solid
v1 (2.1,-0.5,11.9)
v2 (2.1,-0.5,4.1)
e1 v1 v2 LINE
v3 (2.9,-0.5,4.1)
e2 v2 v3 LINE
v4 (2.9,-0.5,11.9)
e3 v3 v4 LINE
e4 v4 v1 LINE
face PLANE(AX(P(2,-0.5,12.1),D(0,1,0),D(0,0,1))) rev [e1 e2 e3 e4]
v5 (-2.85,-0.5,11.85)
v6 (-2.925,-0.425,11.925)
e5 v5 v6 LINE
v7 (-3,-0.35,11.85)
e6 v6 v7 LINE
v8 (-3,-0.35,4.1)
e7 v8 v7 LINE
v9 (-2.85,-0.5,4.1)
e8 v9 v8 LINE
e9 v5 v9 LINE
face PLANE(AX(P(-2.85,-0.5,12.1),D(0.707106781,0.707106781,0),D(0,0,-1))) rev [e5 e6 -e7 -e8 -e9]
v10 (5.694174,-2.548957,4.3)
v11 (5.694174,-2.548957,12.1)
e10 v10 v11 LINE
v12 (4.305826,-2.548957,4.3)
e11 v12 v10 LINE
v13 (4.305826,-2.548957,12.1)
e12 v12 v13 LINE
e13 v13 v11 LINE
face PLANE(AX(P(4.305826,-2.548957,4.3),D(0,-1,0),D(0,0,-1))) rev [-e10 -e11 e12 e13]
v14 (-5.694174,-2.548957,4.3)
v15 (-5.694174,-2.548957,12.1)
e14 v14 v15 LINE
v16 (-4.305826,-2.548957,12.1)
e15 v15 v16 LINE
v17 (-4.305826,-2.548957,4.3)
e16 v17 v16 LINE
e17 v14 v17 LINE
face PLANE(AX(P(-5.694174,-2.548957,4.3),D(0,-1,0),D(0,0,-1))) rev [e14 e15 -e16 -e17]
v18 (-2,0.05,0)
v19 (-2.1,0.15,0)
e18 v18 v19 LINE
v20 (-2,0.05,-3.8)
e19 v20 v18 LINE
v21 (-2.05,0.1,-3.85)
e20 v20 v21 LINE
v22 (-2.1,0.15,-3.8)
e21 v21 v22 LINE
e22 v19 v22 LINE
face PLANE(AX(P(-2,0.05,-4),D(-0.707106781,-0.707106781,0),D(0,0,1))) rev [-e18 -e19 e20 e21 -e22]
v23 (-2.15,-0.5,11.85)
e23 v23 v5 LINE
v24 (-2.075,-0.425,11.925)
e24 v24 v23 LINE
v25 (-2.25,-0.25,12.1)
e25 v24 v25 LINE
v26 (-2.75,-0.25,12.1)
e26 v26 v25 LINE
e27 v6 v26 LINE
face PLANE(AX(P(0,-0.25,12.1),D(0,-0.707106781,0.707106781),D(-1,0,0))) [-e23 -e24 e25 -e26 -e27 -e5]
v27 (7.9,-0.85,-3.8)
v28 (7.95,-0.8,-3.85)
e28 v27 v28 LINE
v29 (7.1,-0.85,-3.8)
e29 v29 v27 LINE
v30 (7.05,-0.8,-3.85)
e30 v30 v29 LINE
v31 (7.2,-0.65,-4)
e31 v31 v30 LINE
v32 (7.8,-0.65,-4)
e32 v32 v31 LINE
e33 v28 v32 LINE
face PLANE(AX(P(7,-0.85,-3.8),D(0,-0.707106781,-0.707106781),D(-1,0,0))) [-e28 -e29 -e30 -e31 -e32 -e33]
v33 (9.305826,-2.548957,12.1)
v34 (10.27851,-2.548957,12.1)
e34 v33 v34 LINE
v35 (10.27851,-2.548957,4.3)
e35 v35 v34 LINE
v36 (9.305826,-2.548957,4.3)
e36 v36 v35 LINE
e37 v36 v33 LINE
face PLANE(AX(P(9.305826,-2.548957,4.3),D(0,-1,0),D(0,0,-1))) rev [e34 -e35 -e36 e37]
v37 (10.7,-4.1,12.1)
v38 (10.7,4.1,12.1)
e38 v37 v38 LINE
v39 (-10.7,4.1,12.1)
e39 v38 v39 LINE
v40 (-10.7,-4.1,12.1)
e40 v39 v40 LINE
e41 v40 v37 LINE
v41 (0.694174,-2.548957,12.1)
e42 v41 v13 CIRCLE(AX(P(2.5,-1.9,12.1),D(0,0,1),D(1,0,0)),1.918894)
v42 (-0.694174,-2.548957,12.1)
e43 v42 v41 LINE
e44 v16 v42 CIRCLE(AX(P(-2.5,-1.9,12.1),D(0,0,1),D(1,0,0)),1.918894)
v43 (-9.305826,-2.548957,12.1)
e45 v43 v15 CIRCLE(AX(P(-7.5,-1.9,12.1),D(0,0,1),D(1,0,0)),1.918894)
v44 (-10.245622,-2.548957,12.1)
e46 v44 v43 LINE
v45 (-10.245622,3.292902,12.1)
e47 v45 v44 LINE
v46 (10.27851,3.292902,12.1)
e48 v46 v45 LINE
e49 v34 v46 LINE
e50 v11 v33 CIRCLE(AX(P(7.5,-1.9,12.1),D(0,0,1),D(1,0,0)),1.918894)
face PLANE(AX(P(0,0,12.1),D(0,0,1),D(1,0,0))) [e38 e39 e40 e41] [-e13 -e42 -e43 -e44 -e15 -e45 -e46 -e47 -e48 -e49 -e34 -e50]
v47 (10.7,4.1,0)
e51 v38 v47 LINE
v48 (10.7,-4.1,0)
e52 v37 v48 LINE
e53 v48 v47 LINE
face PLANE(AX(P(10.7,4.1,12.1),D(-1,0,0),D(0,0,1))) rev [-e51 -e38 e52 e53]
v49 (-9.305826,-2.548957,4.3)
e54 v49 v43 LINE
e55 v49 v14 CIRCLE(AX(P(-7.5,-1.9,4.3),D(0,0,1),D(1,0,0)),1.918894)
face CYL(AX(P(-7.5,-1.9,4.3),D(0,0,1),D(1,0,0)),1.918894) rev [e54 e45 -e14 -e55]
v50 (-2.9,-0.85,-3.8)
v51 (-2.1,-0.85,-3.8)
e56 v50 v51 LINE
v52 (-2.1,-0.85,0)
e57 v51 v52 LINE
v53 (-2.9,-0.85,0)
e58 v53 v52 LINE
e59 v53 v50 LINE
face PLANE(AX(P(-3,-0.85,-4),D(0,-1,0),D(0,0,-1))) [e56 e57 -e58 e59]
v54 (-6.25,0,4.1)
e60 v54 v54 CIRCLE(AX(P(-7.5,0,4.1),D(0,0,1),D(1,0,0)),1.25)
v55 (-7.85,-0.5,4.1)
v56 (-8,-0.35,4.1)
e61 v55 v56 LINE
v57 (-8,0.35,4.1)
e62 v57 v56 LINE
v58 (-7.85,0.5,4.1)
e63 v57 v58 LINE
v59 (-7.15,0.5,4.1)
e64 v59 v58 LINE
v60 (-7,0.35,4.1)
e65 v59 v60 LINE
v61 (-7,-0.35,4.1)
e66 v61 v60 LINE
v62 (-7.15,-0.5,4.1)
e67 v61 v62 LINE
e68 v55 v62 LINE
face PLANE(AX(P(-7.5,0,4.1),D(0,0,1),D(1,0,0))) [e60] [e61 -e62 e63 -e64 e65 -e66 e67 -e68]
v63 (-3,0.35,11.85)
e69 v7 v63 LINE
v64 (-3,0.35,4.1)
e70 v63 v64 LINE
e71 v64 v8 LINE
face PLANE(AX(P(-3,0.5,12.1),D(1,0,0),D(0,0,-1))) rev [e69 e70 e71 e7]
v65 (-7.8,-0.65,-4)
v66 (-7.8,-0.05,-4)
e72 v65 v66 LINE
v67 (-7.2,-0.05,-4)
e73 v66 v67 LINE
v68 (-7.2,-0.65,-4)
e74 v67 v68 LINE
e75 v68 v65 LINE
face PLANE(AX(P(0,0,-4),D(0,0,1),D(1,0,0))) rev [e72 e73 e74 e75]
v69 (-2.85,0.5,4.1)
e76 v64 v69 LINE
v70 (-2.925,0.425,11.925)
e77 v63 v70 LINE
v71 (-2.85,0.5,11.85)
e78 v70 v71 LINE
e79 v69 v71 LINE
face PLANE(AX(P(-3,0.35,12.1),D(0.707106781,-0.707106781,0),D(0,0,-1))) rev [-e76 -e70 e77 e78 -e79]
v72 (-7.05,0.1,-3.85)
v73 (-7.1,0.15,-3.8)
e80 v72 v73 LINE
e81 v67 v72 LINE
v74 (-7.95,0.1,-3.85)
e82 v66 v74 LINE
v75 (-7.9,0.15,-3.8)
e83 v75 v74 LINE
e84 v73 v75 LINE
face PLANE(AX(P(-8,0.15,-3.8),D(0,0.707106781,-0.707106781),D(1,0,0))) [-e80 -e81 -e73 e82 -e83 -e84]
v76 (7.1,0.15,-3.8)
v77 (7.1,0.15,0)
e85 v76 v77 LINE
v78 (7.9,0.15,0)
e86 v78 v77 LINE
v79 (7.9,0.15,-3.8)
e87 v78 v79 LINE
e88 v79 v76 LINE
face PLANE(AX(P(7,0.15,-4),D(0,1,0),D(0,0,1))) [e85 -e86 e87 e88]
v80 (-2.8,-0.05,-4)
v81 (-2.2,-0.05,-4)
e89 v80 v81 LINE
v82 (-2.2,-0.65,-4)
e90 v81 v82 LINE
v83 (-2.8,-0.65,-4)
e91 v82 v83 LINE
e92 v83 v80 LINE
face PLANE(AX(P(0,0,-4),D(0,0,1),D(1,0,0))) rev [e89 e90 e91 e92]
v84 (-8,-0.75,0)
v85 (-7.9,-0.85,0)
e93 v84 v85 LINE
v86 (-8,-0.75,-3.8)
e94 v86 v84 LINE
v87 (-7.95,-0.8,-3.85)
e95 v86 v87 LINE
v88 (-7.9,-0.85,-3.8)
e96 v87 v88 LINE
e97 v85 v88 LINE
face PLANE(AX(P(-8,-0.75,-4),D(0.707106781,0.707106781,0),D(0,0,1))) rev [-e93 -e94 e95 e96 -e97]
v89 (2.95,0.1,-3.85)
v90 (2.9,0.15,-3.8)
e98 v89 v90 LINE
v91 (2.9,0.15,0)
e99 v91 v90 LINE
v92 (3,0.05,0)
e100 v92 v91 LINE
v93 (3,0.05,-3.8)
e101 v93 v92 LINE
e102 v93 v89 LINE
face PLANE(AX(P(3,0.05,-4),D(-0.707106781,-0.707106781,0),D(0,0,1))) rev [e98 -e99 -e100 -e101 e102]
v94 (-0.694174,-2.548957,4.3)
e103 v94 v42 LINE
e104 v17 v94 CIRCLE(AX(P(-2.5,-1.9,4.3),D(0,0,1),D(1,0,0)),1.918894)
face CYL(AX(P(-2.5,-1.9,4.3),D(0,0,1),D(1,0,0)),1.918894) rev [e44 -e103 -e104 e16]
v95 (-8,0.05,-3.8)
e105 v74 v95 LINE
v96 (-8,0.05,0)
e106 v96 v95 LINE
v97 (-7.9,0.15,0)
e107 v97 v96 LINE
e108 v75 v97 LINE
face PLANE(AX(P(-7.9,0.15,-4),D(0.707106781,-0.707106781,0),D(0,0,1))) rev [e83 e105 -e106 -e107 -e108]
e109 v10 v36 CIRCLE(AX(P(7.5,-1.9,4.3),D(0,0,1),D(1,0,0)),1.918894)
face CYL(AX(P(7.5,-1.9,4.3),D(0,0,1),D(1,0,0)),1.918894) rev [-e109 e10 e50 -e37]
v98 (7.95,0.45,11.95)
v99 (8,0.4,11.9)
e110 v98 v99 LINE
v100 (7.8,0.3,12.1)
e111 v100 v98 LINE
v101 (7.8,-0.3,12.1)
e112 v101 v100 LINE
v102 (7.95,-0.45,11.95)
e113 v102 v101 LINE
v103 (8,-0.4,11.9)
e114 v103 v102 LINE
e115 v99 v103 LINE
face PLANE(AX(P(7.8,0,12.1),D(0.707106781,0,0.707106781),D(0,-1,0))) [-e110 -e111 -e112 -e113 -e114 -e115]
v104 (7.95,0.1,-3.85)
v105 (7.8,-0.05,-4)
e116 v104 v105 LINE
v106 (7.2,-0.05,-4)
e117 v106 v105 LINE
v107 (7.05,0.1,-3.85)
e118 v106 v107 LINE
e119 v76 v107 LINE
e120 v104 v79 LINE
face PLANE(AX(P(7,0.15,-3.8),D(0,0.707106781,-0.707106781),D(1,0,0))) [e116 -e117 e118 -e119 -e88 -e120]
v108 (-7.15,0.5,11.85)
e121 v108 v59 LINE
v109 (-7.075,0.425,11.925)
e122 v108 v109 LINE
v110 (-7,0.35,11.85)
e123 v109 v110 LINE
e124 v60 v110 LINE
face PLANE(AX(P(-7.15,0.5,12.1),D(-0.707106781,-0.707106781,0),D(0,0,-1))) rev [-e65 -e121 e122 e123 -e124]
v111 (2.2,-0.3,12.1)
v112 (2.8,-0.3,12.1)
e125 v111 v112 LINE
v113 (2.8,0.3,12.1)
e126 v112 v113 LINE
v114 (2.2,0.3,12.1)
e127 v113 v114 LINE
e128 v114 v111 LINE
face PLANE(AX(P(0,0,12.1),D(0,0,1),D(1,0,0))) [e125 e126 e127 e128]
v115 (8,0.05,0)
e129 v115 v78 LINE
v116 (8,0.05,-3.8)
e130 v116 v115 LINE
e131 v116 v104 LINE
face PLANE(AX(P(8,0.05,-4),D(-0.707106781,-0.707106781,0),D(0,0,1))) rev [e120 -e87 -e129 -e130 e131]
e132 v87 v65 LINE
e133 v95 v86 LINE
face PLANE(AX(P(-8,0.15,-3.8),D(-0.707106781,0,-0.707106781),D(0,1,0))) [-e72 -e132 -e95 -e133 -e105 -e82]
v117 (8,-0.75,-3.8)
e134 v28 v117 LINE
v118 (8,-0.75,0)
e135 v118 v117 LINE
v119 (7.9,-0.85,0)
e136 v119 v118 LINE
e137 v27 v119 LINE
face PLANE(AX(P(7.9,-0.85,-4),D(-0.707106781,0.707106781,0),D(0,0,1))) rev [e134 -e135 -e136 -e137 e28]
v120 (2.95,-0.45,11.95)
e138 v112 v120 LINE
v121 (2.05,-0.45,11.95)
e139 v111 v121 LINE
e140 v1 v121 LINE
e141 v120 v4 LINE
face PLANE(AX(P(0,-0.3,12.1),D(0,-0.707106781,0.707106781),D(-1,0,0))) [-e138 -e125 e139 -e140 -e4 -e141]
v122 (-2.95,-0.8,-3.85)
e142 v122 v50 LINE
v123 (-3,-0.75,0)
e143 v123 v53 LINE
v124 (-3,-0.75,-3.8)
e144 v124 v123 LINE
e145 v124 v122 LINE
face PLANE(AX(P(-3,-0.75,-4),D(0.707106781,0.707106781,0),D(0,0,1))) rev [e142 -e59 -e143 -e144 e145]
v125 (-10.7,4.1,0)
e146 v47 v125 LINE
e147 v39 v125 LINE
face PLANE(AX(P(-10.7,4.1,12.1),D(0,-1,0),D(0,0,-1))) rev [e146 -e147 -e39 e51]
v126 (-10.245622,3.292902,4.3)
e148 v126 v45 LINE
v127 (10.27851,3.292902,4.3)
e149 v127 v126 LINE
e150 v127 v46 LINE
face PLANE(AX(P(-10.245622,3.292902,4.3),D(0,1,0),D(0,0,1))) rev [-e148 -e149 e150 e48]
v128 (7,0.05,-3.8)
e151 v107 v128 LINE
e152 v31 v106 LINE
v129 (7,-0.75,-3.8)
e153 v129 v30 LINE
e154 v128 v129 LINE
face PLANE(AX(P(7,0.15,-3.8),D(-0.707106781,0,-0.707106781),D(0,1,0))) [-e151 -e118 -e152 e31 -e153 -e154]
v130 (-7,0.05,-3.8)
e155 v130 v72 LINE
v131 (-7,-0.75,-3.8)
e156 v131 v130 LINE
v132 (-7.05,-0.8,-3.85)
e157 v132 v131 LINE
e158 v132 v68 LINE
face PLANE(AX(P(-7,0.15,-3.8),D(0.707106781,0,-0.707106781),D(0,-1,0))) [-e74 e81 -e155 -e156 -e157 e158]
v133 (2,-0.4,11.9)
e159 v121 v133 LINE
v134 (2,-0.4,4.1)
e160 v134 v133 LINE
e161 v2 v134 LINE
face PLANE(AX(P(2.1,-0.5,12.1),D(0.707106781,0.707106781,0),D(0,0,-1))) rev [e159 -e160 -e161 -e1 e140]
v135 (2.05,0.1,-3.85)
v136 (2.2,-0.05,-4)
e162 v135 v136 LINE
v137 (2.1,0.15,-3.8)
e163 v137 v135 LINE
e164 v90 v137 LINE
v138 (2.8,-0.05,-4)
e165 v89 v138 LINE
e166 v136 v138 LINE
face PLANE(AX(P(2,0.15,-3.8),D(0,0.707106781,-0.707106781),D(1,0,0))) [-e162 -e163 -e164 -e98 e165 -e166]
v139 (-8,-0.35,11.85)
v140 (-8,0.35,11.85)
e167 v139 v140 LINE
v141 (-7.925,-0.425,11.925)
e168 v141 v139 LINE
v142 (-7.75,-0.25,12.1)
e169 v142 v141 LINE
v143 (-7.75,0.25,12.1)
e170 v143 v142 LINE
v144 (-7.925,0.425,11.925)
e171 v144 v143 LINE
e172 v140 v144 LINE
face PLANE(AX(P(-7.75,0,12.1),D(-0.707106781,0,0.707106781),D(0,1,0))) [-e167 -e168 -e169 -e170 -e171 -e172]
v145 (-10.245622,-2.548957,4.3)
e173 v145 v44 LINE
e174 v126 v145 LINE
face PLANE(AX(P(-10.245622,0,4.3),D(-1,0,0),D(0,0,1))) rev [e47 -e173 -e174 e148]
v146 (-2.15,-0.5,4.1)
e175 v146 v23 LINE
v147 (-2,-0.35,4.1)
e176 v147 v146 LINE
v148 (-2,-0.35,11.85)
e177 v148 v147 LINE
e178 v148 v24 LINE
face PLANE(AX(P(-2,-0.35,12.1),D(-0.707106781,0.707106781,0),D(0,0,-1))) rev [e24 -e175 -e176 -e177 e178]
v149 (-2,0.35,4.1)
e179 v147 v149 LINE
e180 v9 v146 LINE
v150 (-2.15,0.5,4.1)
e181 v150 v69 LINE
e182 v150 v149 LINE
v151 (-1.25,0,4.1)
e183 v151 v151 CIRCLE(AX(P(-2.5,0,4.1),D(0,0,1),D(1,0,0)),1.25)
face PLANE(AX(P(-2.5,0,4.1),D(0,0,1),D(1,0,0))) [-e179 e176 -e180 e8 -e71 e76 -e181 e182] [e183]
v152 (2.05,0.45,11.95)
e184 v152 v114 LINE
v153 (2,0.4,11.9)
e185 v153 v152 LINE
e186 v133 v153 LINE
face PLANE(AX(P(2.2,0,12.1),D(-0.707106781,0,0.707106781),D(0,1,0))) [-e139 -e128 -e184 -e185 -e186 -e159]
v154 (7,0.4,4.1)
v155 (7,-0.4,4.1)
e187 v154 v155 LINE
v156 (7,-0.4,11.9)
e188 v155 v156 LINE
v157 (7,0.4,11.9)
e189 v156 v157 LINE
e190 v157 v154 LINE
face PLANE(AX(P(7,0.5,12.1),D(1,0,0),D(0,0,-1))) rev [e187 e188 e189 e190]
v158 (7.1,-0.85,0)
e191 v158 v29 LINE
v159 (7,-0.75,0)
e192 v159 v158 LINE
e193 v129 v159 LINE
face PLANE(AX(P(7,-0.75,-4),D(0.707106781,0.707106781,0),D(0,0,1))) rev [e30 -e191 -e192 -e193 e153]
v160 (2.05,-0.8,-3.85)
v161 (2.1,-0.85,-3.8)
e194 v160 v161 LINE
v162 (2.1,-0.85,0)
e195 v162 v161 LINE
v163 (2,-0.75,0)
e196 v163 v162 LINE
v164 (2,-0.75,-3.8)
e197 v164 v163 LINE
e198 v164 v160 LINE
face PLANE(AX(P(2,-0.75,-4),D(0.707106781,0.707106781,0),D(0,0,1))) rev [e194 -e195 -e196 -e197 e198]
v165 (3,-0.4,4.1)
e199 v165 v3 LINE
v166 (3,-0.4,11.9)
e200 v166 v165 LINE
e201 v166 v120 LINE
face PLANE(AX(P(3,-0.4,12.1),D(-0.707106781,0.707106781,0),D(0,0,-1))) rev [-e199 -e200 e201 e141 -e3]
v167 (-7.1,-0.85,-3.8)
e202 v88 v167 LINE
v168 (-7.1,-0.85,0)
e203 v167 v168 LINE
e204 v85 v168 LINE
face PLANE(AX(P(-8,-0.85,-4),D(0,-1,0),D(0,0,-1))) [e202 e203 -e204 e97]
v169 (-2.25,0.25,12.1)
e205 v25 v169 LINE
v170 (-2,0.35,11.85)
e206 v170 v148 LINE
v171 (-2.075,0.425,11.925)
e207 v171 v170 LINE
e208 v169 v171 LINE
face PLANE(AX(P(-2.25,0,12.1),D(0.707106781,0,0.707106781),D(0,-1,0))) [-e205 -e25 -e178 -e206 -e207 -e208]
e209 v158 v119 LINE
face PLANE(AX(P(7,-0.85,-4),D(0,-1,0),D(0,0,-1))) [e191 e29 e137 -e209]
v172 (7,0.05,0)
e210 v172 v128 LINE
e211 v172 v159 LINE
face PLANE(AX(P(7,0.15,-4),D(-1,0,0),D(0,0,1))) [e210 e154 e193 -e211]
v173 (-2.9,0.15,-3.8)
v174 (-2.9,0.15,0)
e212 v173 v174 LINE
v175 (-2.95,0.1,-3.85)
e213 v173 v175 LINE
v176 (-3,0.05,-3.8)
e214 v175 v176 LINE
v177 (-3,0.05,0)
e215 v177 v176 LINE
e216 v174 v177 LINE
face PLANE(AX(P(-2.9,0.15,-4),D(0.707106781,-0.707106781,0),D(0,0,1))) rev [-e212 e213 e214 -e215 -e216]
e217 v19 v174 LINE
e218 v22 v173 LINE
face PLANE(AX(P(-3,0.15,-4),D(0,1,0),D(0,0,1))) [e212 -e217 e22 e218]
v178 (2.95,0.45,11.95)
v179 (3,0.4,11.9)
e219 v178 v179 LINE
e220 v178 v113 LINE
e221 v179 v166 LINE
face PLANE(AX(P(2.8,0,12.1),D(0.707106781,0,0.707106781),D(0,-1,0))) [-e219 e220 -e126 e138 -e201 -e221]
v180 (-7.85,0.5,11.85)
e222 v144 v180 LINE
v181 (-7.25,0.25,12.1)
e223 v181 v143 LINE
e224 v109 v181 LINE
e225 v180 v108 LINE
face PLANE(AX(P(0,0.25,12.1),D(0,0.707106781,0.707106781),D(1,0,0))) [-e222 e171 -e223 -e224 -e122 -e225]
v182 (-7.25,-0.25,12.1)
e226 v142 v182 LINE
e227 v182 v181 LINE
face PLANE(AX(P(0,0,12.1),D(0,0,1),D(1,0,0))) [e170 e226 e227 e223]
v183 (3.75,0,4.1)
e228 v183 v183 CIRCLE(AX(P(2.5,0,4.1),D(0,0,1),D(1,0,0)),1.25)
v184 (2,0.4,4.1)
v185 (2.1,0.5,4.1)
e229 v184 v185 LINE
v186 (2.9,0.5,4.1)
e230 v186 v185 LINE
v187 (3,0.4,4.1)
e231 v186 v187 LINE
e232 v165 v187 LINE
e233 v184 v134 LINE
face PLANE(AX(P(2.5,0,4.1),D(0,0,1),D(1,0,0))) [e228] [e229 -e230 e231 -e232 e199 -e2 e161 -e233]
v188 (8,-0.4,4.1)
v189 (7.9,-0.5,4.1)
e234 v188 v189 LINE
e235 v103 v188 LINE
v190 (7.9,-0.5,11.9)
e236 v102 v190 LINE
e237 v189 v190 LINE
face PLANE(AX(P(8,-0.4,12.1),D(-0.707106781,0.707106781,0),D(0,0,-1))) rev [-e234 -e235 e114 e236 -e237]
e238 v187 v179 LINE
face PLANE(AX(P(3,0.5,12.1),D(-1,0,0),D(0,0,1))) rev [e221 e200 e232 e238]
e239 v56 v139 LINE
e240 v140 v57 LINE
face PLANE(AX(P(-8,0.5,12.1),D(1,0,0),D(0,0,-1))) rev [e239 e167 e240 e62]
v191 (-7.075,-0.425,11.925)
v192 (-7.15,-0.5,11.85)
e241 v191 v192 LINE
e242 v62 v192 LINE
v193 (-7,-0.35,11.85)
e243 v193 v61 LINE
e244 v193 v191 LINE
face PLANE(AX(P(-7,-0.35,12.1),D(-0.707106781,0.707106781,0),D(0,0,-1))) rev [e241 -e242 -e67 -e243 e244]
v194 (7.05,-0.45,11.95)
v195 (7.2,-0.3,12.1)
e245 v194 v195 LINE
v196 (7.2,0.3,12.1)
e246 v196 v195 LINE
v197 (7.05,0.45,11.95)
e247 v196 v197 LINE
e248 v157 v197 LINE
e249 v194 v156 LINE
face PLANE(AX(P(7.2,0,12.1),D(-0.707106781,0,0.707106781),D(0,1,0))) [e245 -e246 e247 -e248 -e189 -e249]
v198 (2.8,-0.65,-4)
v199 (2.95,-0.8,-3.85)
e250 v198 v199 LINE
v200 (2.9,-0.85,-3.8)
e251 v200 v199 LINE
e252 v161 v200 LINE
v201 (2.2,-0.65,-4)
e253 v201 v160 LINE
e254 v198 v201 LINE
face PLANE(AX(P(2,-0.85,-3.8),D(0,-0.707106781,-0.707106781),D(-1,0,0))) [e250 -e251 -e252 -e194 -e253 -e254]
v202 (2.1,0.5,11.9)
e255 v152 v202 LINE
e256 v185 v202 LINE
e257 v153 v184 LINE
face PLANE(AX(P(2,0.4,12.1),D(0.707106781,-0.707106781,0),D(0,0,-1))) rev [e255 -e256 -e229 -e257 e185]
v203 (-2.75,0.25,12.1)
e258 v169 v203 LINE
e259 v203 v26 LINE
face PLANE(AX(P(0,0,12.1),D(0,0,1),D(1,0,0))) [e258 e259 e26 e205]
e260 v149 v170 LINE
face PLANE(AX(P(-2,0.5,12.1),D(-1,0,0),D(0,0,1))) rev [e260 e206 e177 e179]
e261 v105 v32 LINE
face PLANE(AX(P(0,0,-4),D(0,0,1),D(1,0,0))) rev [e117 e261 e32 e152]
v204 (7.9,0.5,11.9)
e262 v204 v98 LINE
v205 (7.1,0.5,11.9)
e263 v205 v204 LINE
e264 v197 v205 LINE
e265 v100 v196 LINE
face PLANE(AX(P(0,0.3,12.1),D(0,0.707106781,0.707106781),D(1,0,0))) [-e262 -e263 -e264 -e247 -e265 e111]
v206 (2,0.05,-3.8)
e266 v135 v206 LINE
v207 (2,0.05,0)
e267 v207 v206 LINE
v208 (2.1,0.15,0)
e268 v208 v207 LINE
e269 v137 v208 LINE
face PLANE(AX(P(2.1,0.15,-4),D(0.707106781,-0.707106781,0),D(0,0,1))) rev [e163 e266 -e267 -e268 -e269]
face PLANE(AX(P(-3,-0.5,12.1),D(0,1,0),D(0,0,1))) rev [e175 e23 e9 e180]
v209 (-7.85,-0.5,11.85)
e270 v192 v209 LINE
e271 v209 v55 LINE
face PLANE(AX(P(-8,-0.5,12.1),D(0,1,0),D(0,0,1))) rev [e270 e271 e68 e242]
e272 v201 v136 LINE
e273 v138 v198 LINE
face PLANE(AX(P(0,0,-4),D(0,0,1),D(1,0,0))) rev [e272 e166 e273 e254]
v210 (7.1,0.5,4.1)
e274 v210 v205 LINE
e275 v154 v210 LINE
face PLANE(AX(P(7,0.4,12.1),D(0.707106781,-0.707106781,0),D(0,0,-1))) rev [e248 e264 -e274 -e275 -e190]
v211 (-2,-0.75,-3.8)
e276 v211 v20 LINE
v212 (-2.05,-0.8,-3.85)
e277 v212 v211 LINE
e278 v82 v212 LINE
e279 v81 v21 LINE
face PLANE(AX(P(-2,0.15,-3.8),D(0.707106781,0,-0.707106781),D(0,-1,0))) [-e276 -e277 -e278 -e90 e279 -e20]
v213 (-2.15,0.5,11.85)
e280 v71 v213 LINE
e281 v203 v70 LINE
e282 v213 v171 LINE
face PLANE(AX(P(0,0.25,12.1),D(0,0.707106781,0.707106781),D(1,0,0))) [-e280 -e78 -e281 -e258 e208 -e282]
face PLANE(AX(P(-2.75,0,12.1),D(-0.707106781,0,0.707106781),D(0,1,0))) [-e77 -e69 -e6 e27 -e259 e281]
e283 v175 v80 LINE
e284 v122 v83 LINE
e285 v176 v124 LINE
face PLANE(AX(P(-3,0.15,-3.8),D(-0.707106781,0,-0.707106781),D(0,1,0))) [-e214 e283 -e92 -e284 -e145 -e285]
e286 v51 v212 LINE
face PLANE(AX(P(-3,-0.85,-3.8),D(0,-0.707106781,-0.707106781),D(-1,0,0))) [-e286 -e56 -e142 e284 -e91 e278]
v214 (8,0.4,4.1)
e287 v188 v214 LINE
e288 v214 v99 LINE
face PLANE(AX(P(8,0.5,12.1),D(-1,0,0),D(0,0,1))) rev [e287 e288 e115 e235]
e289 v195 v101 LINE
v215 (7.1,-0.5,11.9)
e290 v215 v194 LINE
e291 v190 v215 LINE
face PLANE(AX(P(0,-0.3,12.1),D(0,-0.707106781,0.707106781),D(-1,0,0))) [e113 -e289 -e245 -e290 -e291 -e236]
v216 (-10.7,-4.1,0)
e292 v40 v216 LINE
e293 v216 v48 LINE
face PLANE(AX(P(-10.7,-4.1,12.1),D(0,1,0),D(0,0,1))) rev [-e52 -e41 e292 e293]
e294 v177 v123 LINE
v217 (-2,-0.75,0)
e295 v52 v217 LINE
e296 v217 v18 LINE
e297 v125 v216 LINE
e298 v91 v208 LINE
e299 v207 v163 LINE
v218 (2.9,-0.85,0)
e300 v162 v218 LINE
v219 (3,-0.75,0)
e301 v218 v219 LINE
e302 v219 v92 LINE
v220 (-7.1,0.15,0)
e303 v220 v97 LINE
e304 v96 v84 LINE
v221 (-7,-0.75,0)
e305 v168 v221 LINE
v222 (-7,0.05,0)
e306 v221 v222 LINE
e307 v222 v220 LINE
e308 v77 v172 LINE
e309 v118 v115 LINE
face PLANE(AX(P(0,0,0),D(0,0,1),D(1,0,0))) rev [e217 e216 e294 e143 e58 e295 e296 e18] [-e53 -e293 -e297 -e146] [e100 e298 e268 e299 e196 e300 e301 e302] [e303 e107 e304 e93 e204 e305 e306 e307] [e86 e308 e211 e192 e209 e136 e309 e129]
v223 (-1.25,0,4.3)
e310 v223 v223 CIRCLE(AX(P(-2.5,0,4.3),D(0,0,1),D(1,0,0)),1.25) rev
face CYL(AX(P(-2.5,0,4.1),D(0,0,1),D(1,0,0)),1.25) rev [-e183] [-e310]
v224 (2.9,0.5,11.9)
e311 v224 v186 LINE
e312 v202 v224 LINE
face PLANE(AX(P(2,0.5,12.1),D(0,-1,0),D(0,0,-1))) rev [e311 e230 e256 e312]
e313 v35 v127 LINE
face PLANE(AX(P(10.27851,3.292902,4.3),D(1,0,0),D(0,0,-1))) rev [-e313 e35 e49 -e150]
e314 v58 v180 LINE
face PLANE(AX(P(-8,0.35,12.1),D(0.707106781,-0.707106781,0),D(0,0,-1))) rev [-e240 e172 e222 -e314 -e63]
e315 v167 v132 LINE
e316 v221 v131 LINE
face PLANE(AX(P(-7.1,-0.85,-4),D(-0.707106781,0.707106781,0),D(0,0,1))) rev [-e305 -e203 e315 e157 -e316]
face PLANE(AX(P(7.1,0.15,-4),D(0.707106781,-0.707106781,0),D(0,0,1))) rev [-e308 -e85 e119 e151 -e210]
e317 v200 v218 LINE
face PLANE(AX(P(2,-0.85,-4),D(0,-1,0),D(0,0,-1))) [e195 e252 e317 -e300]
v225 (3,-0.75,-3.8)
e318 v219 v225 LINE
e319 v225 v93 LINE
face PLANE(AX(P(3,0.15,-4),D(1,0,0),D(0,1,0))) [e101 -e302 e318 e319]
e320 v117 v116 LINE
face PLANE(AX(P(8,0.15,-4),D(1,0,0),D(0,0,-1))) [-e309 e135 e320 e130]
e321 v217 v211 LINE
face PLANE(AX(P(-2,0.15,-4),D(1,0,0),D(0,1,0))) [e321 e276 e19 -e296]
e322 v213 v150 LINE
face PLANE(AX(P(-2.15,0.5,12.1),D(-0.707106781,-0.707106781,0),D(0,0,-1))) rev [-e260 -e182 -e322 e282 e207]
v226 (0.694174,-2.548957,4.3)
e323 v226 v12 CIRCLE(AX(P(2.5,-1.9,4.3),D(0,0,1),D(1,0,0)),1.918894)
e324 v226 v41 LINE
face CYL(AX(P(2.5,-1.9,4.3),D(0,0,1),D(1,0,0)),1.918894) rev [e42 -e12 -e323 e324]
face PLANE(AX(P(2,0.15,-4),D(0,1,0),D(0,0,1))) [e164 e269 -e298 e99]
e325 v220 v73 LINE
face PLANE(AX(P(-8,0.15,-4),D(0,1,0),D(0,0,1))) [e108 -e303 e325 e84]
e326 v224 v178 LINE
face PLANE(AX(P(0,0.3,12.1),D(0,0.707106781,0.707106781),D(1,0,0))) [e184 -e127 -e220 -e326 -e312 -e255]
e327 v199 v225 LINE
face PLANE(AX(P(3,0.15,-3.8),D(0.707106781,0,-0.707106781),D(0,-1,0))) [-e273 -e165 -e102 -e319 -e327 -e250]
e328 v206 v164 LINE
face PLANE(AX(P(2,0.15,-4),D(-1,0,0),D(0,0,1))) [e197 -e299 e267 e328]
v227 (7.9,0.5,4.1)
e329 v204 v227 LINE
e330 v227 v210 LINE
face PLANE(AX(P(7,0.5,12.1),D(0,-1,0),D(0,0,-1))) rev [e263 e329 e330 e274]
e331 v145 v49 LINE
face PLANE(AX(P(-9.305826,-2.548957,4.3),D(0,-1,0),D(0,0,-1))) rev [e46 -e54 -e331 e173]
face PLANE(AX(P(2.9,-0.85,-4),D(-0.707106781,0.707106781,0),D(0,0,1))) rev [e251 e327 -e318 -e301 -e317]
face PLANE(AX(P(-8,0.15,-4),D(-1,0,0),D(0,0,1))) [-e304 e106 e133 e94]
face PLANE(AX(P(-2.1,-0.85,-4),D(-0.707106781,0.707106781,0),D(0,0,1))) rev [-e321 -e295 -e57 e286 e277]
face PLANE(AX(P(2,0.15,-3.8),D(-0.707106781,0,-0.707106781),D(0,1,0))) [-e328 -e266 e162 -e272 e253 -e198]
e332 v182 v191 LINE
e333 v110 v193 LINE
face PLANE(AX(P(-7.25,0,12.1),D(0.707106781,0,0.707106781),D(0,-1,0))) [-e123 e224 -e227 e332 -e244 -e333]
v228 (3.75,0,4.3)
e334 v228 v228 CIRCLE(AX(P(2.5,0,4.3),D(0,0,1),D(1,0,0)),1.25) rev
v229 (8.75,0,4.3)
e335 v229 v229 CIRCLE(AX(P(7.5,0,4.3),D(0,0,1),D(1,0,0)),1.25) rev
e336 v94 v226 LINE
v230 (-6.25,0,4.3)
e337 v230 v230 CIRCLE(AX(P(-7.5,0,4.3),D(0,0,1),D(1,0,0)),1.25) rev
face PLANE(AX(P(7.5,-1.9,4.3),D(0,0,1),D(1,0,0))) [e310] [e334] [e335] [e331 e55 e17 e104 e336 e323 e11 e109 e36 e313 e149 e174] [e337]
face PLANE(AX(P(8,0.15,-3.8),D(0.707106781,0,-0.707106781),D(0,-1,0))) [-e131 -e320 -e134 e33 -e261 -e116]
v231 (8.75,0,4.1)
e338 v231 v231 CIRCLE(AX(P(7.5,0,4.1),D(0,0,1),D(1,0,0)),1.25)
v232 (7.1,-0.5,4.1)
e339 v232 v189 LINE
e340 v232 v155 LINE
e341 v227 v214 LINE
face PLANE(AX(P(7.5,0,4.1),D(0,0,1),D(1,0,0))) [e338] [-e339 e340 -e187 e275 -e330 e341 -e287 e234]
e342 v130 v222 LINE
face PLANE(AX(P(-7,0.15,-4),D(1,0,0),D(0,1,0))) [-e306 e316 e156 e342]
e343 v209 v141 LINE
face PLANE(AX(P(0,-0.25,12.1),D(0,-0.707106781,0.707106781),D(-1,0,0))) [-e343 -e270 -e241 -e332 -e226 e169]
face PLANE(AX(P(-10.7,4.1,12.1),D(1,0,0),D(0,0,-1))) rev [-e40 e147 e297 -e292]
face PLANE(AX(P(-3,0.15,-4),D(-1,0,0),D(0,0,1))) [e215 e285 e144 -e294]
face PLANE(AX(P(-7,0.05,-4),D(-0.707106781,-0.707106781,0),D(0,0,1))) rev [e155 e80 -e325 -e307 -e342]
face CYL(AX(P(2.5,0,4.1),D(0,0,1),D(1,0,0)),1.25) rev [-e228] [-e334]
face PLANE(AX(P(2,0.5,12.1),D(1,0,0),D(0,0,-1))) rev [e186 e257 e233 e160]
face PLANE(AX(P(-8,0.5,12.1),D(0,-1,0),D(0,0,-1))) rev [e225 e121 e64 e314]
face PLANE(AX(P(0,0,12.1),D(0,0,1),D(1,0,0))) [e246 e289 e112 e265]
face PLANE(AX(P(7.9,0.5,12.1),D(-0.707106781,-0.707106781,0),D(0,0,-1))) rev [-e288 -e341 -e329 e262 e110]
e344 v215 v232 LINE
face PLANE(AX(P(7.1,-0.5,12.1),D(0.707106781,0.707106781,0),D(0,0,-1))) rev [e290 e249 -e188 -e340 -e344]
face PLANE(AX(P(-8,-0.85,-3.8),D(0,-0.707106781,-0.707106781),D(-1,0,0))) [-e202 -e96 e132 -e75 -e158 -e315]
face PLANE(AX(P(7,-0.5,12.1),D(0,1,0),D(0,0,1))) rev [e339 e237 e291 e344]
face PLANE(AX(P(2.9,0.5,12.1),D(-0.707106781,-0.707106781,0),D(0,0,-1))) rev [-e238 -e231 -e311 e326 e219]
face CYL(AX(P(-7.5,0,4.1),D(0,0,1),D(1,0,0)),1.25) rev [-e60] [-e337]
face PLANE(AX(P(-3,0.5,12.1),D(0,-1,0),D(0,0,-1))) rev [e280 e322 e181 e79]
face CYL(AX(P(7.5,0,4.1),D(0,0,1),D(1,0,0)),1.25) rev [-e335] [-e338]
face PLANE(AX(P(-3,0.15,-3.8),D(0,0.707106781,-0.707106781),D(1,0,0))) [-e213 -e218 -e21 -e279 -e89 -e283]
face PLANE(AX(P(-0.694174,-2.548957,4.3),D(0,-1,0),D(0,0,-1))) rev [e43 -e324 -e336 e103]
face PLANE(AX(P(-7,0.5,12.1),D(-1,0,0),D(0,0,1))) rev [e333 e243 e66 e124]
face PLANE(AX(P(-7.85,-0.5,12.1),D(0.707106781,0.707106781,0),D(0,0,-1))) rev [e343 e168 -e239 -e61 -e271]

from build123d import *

# Parameters (mm, degrees)
SKETCH_1_W          = 21.4
SKETCH_1_H          = 8.2
EXTRUDE_1_DEPTH     = 12.1
SKETCH_4_R          = 1.25
CUT_EXTRUDE_3_DEPTH = 8
CUT_EXTRUDE_4_DEPTH = 7.8
SKETCH_7_W          = 1
SKETCH_7_H          = 1
EXTRUDE_2_DEPTH     = 8
CHAMFER_1_SIZE      = 0.15
CHAMFER_2_SIZE      = 0.25
SKETCH_8_W          = 1
SKETCH_8_H          = 1
EXTRUDE_3_DEPTH     = 4
CHAMFER_6_SIZE      = 0.1
CHAMFER_7_SIZE      = 0.2
CHAMFER_10_SIZE     = 0.1
CHAMFER_11_SIZE     = 0.2
CHAMFER_12_SIZE     = 0.1
CHAMFER_13_SIZE     = 0.2
CHAMFER_14_SIZE     = 0.1
CHAMFER_15_SIZE     = 0.2


with BuildPart() as part:
    # Эскиз1 → Бобышка-Вытянуть1 (new body)
    with BuildSketch(Plane.XY):
        Rectangle(SKETCH_1_W, SKETCH_1_H)
    extrude(amount=EXTRUDE_1_DEPTH)

    # Эскиз4 → Вырез-Вытянуть3 (cut)
    with BuildSketch(Plane.XY.offset(12.1)):
        with Locations((-7.5, 0)):
            Circle(SKETCH_4_R)
        with Locations((-2.5, 0)):
            Circle(SKETCH_4_R)
        with Locations((2.5, 0)):
            Circle(SKETCH_4_R)
        with Locations((7.5, 0)):
            Circle(SKETCH_4_R)
    extrude(amount=-CUT_EXTRUDE_3_DEPTH, mode=Mode.SUBTRACT)

    # Эскиз5 → Вырез-Вытянуть4 (cut)
    with BuildSketch(Plane.XY.offset(12.1)):
        with BuildLine():
            Line((-10.245621634, 0), (-10.245621634, 3.292901982))
            Line((-10.245621634, 3.292901982), (0.278509544, 3.292901982))
            Line((0.278509544, 3.292901982), (5.278509544, 3.292901982))
            Line((5.278509544, 3.292901982), (10.278509544, 3.292901982))
            Line((10.278509544, 3.292901982), (10.278509544, -2.548957219))
            Line((10.278509544, -2.548957219), (9.30582632, -2.548957219))
            ThreePointArc((9.30582632, -2.548957219), (7.5, -3.818893996), (5.69417368, -2.548957219))
            Line((5.69417368, -2.548957219), (4.30582632, -2.548957219))
            ThreePointArc((4.30582632, -2.548957219), (2.5, -3.818893996), (0.69417368, -2.548957219))
            Line((0.69417368, -2.548957219), (-0.69417368, -2.548957219))
            ThreePointArc((-0.69417368, -2.548957219), (-2.5, -3.818893996), (-4.30582632, -2.548957219))
            Line((-4.30582632, -2.548957219), (-5.69417368, -2.548957219))
            ThreePointArc((-5.69417368, -2.548957219), (-7.5, -3.818893996), (-9.30582632, -2.548957219))
            Line((-9.30582632, -2.548957219), (-10.245621634, -2.548957219))
            Line((-10.245621634, -2.548957219), (-10.245621634, 0))
        make_face()
    extrude(amount=-CUT_EXTRUDE_4_DEPTH, mode=Mode.SUBTRACT)

    # Эскиз7 → Бобышка-Вытянуть2 (add)
    with BuildSketch(Plane.XY.offset(4.1)):
        with Locations((-2.5, 0)):
            Rectangle(SKETCH_7_W, SKETCH_7_H)
        with Locations((-7.5, 0)):
            Rectangle(SKETCH_7_W, SKETCH_7_H)
        with Locations((2.5, 0)):
            Rectangle(SKETCH_7_W, SKETCH_7_H)
        with Locations((7.5, 0)):
            Rectangle(SKETCH_7_W, SKETCH_7_H)
    extrude(amount=EXTRUDE_2_DEPTH)

    # Фаска1
    chamfer_1_edges = [part.edges().sort_by_distance(p)[0] for p in [
        (-7, -0.5, 8.1),
        (-7, 0.5, 8.1),
        (-8, 0.5, 8.1),
        (-8, -0.5, 8.1),
        (-2, -0.5, 8.1),
        (-2, 0.5, 8.1),
        (-3, 0.5, 8.1),
        (-3, -0.5, 8.1),
    ]]
    chamfer(chamfer_1_edges, length=CHAMFER_1_SIZE)

    # Фаска2
    # the kernel refuses this chamfer: 0.25 mm, written as the material it takes off along each edge
    with BuildSketch(Plane(origin=(-3, -0.992920747, 12.1), x_dir=(-0.02749587661058555, 0, -0.9996219169112968), z_dir=(0, 1, 0)), Plane(origin=(-3.492920747, 0.5, 12.1), x_dir=(0, 0.027495876610586414, -0.9996219169112968), z_dir=(1, 0, 0)), Plane(origin=(-2, 0.992920747, 12.1), x_dir=(0.027495876610586414, 0, -0.9996219169112968), z_dir=(0, -1, 0)), Plane(origin=(-1.507079253, -0.5, 12.1), x_dir=(0, -0.027495876610586414, -0.9996219169112968), z_dir=(-1, 0, 0)), Plane(origin=(-7, 0.992920747, 12.1), x_dir=(0.02749587661058555, 0, -0.9996219169112968), z_dir=(0, -1, 0)), Plane(origin=(-6.507079253, -0.5, 12.1), x_dir=(0, -0.027495876610586414, -0.9996219169112968), z_dir=(-1, 0, 0)), Plane(origin=(-8, -0.992920747, 12.1), x_dir=(-0.027495876610589005, 0, -0.9996219169112968), z_dir=(0, 1, 0)), Plane(origin=(-8.492920747, 0.5, 12.1), x_dir=(0, 0.027495876610586414, -0.9996219169112968), z_dir=(1, 0, 0))) as chamfer_2_piece_1:
        Polygon((CHAMFER_2_SIZE * 0.999621916911, -CHAMFER_2_SIZE * 0.0274958766106), (-CHAMFER_2_SIZE * 0.0274958766106, -CHAMFER_2_SIZE * 0.999621916911), (0, 0), align=None)
    extrude(amount=1.985841494, mode=Mode.SUBTRACT)

    # Эскиз8 → Бобышка-Вытянуть3 (add)
    with BuildSketch(Plane(origin=(0, -4.1, 0), x_dir=(-1, 0, 0), z_dir=(0, 0, 1))):
        with Locations((2.5, -3.75)):
            Rectangle(SKETCH_8_W, SKETCH_8_H)
        with Locations((7.5, -3.75)):
            Rectangle(SKETCH_8_W, SKETCH_8_H)
        with Locations((-2.5, -3.75)):
            Rectangle(SKETCH_8_W, SKETCH_8_H)
        with Locations((-7.5, -3.75)):
            Rectangle(SKETCH_8_W, SKETCH_8_H)
    extrude(amount=-EXTRUDE_3_DEPTH)

    # Фаска6
    chamfer_6_edges = [part.edges().sort_by_distance(p)[0] for p in [
        (3, -0.5, 8.1),
        (3, 0.5, 8.1),
        (2, 0.5, 8.1),
        (2, -0.5, 8.1),
    ]]
    chamfer(chamfer_6_edges, length=CHAMFER_6_SIZE)

    # Фаска7
    # the kernel refuses this chamfer: 0.2 mm, written as the material it takes off along each edge
    with BuildSketch(Plane(origin=(3, 0.914336598, 12.1), x_dir=(0.02749587661058742, 0, -0.9996219169112966), z_dir=(0, -1, 0)), Plane(origin=(3.414336598, -0.5, 12.1), x_dir=(0, -0.02749587661058634, -0.9996219169112966), z_dir=(-1, 0, 0)), Plane(origin=(2, -0.914336598, 12.1), x_dir=(-0.02749587661058634, 0, -0.9996219169112966), z_dir=(0, 1, 0)), Plane(origin=(1.585663402, 0.5, 12.1), x_dir=(0, 0.02749587661058634, -0.9996219169112966), z_dir=(1, 0, 0))) as chamfer_7_piece_1:
        Polygon((CHAMFER_7_SIZE * 0.999621916911, -CHAMFER_7_SIZE * 0.0274958766106), (-CHAMFER_7_SIZE * 0.0274958766106, -CHAMFER_7_SIZE * 0.999621916911), (0, 0), align=None)
    extrude(amount=1.828673195, mode=Mode.SUBTRACT)

    # Фаска10
    chamfer_10_edges = [part.edges().sort_by_distance(p)[0] for p in [
        (-7, 0.15, -2),
        (-7, -0.85, -2),
        (-8, -0.85, -2),
        (-8, 0.15, -2),
        (-2, 0.15, -2),
        (-2, -0.85, -2),
        (-3, -0.85, -2),
        (-3, 0.15, -2),
        (3, 0.15, -2),
        (3, -0.85, -2),
        (2, -0.85, -2),
        (2, 0.15, -2),
    ]]
    chamfer(chamfer_10_edges, length=CHAMFER_10_SIZE)

    # Фаска11
    # the kernel refuses this chamfer: 0.2 mm, written as the material it takes off along each edge
    with BuildSketch(Plane(origin=(-7, 0.564336598, -4), x_dir=(0.027495876610587302, 0, 0.9996219169112966), z_dir=(0, -1, 0)), Plane(origin=(-8.414336598, 0.15, -4), x_dir=(0, 0.027495876610586355, 0.9996219169112966), z_dir=(1, 0, 0)), Plane(origin=(-8, -1.264336598, -4), x_dir=(-0.027495876610587302, 0, 0.9996219169112966), z_dir=(0, 1, 0)), Plane(origin=(-6.585663402, -0.85, -4), x_dir=(0, -0.027495876610586223, 0.9996219169112966), z_dir=(-1, 0, 0)), Plane(origin=(-1.585663402, -0.85, -4), x_dir=(0, -0.027495876610586223, 0.9996219169112966), z_dir=(-1, 0, 0)), Plane(origin=(-3, -1.264336598, -4), x_dir=(-0.027495876610587302, 0, 0.9996219169112966), z_dir=(0, 1, 0)), Plane(origin=(-3.414336598, 0.15, -4), x_dir=(0, 0.027495876610586355, 0.9996219169112966), z_dir=(1, 0, 0)), Plane(origin=(-2, 0.564336598, -4), x_dir=(0.027495876610586223, 0, 0.9996219169112966), z_dir=(0, -1, 0)), Plane(origin=(2, -1.264336598, -4), x_dir=(-0.027495876610586223, 0, 0.9996219169112966), z_dir=(0, 1, 0)), Plane(origin=(1.585663402, 0.15, -4), x_dir=(0, 0.027495876610586355, 0.9996219169112966), z_dir=(1, 0, 0)), Plane(origin=(3, 0.564336598, -4), x_dir=(0.027495876610587302, 0, 0.9996219169112966), z_dir=(0, -1, 0)), Plane(origin=(3.414336598, -0.85, -4), x_dir=(0, -0.027495876610586223, 0.9996219169112966), z_dir=(-1, 0, 0))) as chamfer_11_piece_1:
        Polygon((CHAMFER_11_SIZE * 0.999621916911, CHAMFER_11_SIZE * 0.0274958766106), (-CHAMFER_11_SIZE * 0.0274958766106, CHAMFER_11_SIZE * 0.999621916911), (0, 0), align=None)
    extrude(amount=1.828673195, mode=Mode.SUBTRACT)

    # Фаска12
    chamfer_12_edges = [part.edges().sort_by_distance(p)[0] for p in [
        (8, 0.15, -2),
        (8, -0.85, -2),
        (7, -0.85, -2),
        (7, 0.15, -2),
    ]]
    chamfer(chamfer_12_edges, length=CHAMFER_12_SIZE)

    # Фаска13
    # the kernel refuses this chamfer: 0.2 mm, written as the material it takes off along each edge
    with BuildSketch(Plane(origin=(6.585663402, 0.15, -4), x_dir=(0, 0.027495876610586355, 0.9996219169112966), z_dir=(1, 0, 0)), Plane(origin=(8, 0.564336598, -4), x_dir=(0.027495876610587302, 0, 0.9996219169112966), z_dir=(0, -1, 0)), Plane(origin=(7, -1.264336598, -4), x_dir=(-0.027495876610587302, 0, 0.9996219169112966), z_dir=(0, 1, 0)), Plane(origin=(8.414336598, -0.85, -4), x_dir=(0, -0.027495876610586223, 0.9996219169112966), z_dir=(-1, 0, 0))) as chamfer_13_piece_1:
        Polygon((CHAMFER_13_SIZE * 0.999621916911, CHAMFER_13_SIZE * 0.0274958766106), (-CHAMFER_13_SIZE * 0.0274958766106, CHAMFER_13_SIZE * 0.999621916911), (0, 0), align=None)
    extrude(amount=1.828673195, mode=Mode.SUBTRACT)

    # Фаска14
    chamfer_14_edges = [part.edges().sort_by_distance(p)[0] for p in [
        (8, -0.5, 8.1),
        (8, 0.5, 8.1),
        (7, 0.5, 8.1),
        (7, -0.5, 8.1),
    ]]
    chamfer(chamfer_14_edges, length=CHAMFER_14_SIZE)

    # Фаска15
    # the kernel refuses this chamfer: 0.2 mm, written as the material it takes off along each edge
    with BuildSketch(Plane(origin=(7, -0.914336598, 12.1), x_dir=(-0.02749587661058742, 0, -0.9996219169112966), z_dir=(0, 1, 0)), Plane(origin=(8.414336598, -0.5, 12.1), x_dir=(0, -0.02749587661058634, -0.9996219169112966), z_dir=(-1, 0, 0)), Plane(origin=(8, 0.914336598, 12.1), x_dir=(0.02749587661058742, 0, -0.9996219169112966), z_dir=(0, -1, 0)), Plane(origin=(6.585663402, 0.5, 12.1), x_dir=(0, 0.02749587661058634, -0.9996219169112966), z_dir=(1, 0, 0))) as chamfer_15_piece_1:
        Polygon((CHAMFER_15_SIZE * 0.999621916911, -CHAMFER_15_SIZE * 0.0274958766106), (-CHAMFER_15_SIZE * 0.0274958766106, -CHAMFER_15_SIZE * 0.999621916911), (0, 0), align=None)
    extrude(amount=1.828673195, mode=Mode.SUBTRACT)


solid = part.part
